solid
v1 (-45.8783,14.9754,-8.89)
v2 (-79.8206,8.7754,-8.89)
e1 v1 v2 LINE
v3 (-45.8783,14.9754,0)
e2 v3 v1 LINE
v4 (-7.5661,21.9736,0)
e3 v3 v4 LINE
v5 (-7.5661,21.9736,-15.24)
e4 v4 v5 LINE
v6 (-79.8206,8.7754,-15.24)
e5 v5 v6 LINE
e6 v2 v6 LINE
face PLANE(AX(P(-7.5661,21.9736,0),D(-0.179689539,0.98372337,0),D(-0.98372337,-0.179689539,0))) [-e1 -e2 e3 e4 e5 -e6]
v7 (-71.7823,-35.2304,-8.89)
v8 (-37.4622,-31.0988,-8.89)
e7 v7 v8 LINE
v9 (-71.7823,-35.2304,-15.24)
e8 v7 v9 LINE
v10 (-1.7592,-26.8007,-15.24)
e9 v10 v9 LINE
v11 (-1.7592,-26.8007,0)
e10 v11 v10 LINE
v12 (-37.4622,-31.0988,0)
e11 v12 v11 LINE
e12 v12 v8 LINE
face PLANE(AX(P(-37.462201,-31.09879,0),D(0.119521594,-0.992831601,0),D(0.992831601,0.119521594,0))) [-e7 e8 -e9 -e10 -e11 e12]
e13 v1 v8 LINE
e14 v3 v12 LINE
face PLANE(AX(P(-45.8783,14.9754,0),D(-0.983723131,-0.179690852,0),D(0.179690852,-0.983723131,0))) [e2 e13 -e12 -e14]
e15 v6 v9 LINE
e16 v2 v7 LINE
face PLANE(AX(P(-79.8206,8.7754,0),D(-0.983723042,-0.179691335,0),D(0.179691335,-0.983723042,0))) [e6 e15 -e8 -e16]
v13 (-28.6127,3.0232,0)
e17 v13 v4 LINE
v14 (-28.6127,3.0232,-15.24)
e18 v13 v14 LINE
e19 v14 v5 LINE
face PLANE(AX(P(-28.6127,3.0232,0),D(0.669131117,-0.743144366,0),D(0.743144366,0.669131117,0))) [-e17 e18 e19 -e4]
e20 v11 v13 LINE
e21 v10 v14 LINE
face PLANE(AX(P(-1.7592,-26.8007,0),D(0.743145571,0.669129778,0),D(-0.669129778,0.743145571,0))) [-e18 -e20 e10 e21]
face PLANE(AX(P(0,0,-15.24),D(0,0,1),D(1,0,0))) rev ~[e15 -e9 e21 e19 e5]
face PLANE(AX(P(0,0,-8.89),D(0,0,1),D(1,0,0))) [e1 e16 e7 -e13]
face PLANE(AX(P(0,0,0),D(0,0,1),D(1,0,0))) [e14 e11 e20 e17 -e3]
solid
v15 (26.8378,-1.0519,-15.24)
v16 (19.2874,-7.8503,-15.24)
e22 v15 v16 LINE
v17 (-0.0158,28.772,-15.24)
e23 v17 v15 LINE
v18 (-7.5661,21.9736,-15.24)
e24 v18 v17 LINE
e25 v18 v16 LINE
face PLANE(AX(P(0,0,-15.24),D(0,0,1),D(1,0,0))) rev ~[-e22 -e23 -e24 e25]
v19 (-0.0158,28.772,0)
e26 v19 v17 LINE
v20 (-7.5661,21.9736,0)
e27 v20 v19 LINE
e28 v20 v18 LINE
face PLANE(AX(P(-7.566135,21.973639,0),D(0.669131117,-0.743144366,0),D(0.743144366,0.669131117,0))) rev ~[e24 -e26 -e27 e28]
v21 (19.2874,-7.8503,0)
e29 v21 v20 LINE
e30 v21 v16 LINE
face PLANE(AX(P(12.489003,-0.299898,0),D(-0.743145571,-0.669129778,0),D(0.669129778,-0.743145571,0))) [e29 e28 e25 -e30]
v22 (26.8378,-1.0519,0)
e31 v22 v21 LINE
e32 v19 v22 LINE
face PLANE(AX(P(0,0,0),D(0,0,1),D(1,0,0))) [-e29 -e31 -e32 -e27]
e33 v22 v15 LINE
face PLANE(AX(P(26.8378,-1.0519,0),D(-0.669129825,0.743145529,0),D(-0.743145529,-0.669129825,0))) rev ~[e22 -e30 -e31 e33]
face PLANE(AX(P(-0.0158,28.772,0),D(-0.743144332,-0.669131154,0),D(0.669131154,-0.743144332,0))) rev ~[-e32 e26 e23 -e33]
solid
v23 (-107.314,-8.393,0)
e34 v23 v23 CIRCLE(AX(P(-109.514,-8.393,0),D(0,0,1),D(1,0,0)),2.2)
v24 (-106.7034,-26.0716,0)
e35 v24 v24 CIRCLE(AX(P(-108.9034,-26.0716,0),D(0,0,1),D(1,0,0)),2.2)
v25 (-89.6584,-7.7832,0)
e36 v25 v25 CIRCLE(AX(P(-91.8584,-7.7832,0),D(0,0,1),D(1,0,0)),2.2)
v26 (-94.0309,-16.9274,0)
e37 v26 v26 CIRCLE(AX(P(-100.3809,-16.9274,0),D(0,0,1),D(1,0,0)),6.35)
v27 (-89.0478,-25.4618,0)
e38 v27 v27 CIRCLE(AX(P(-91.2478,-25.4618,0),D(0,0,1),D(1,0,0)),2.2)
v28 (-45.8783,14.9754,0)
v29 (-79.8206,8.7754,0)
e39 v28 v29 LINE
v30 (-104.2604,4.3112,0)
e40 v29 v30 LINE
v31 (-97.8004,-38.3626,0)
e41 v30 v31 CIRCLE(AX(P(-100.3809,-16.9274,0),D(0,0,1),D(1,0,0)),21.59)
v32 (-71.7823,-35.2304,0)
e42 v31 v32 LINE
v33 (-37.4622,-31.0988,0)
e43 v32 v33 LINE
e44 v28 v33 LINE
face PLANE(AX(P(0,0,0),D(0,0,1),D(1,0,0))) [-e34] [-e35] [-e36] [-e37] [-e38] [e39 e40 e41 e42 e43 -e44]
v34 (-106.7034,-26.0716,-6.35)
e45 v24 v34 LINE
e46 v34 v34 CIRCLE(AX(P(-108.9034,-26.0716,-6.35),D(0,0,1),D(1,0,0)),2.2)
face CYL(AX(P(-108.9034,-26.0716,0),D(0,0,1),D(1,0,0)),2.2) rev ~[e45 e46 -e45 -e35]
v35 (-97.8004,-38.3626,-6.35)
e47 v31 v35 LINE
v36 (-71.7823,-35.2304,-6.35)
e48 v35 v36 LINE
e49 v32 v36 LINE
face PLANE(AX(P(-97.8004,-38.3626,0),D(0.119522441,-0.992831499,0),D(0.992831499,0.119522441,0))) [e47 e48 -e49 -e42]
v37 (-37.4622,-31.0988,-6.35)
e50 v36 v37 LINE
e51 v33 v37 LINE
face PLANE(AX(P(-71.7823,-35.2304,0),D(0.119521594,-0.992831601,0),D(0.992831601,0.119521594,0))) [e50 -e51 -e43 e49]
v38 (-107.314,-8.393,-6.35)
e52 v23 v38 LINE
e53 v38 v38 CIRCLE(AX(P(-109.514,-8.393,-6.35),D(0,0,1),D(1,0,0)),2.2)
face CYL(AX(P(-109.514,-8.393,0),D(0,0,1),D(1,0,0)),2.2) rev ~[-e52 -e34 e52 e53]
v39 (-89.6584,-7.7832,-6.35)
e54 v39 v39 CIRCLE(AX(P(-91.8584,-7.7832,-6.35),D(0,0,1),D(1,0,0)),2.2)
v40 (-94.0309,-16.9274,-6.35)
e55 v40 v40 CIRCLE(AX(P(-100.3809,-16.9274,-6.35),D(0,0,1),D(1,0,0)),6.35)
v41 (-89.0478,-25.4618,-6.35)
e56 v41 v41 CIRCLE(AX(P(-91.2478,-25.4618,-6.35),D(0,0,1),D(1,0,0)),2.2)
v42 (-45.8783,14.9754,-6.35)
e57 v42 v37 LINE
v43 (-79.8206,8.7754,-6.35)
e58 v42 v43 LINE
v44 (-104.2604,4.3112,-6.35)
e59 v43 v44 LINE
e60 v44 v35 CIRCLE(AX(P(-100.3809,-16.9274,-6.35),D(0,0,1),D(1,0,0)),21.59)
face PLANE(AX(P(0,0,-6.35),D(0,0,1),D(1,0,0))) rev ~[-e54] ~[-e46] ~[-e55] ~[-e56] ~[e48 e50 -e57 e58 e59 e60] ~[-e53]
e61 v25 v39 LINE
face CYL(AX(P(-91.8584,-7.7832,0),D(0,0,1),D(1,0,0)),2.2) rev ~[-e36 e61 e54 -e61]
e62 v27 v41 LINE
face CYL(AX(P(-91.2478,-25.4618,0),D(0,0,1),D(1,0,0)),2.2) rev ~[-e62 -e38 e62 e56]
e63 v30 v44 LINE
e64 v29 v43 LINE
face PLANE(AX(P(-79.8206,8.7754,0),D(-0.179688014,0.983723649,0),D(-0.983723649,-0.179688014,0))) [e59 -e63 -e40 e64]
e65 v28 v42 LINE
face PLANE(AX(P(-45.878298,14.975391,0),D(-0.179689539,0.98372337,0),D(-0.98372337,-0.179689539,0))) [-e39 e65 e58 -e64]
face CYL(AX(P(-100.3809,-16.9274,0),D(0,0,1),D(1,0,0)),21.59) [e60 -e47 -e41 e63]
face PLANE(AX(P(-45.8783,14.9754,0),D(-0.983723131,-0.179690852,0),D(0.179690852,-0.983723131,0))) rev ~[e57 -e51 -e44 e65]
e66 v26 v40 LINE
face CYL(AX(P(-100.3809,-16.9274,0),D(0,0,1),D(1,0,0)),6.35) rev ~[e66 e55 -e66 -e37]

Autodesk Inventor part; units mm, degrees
ref_plane "Back Plane" through (0, 0, -12.7) normal (0, 0, -1) x (-1, 0, 0)
ref_plane "Midplane" through (0, 0, -6.35) normal (0, 0, 1) x (1, 0, 0)
ref_plane "YZ Plane" through (0, 0, 0) normal (1, 0, 0) x (0, 1, 0)
sketch "the Axle" plane through (0, 0, 0) normal (0, 0, 1) x (1, 0, 0)
  line L0 (-30.4731, 63.7704) -> (-43.9693, 51.6183)
  line L1 (-43.9693, 51.6183) -> (-54.1341, 62.9075)
  line L2 (-40.6378, 75.0595) -> (-30.4731, 63.7704)
  line L3 (-30.4731, 63.7704) -> (-12.3121, 63.7704) construction
  arc A0 (-40.6378, 75.0595) -> (-54.1341, 62.9075) centre (-42.9621, 64.0703) ccw
  line L4 (-54.1341, 62.9075) -> (-40.6378, 75.0595) construction
  point P0 (-12.6671, 65.6222)
  dimension "d84" = 18.161
  dimension "d85" = 138
  dimension "d231" = 19.812
sketch "Motor Mount Pattern" plane through (0, 0, 0) normal (0, 0, 1) x (1, 0, 0)
  line L0 (-116.3697, 51.2894) -> (-116.3697, 68.9671) construction
  line L1 (-116.3697, 68.9671) -> (-134.0474, 68.9671) construction
  line L2 (-134.0474, 68.9671) -> (-134.0474, 51.2894) construction
  line L3 (-134.0474, 51.2894) -> (-116.3697, 68.9671) construction
  line L4 (-116.3697, 51.2894) -> (-134.0474, 68.9671) construction
  line L5 (-134.0474, 51.2894) -> (-134.0474, 68.9671) construction
  line L6 (-134.0474, 51.2894) -> (-116.3697, 68.9671) construction
  line L7 (-134.0474, 51.2894) -> (-125.2086, 60.1282) construction
  line L8 (-116.3697, 51.2894) -> (-134.0474, 51.2894) construction
  circle A0 centre (-125.2086, 60.1282) radius 6.2
  circle A1 centre (-116.3697, 68.9671) radius 2.25
  circle A2 centre (-134.0474, 68.9671) radius 2.25
  circle A3 centre (-116.3697, 51.2894) radius 2.25
  circle A4 centre (-134.0474, 51.2894) radius 2.25
  circle A5 centre (-116.3697, 68.9671) radius 4.5 construction
  circle A6 centre (-134.0474, 68.9671) radius 4.5 construction
  circle A7 centre (-134.0474, 51.2894) radius 4.5 construction
  circle A8 centre (-116.3697, 51.2894) radius 4.5 construction
  point P0 (-121.7102, 57.8126)
  dimension "d189" = 25
  dimension "d192" = 12.4
  dimension "d193" = 4.5
  dimension "d195" = 9
sketch "Motor Body Extent" plane through (0, 0, 0) normal (0, 0, 1) x (1, 0, 0)
  circle A0 centre (-176.4641, 62.233) radius 24.5 construction
  dimension "MotorDia" = 49
sketch "Block7" plane through (0, 0, 0) normal (0, 0, 1) x (1, 0, 0)
  line L0 (-114.6206, 39.8537) -> (-104.0422, 54.0169) construction
  line L1 (-104.0422, 54.0169) -> (-118.2054, 64.5953) construction
  line L2 (-118.2054, 64.5953) -> (-128.7838, 50.432) construction
  line L3 (-128.7838, 50.432) -> (-104.0422, 54.0169) construction
  line L4 (-114.6206, 39.8537) -> (-118.2054, 64.5953) construction
  line L5 (-128.7838, 50.432) -> (-118.2054, 64.5953) construction
  line L6 (-128.7838, 50.432) -> (-104.0422, 54.0169) construction
  line L7 (-128.7838, 50.432) -> (-116.413, 52.2245) construction
  line L8 (-114.6206, 39.8537) -> (-128.7838, 50.432) construction
  circle A0 centre (-116.413, 52.2245) radius 6.2
  circle A1 centre (-104.0422, 54.0169) radius 2.25
  circle A2 centre (-118.2054, 64.5953) radius 2.25
  circle A3 centre (-114.6206, 39.8537) radius 2.25
  circle A4 centre (-128.7838, 50.432) radius 2.25
  circle A5 centre (-104.0422, 54.0169) radius 4.5 construction
  circle A6 centre (-118.2054, 64.5953) radius 4.5 construction
  circle A7 centre (-128.7838, 50.432) radius 4.5 construction
  circle A8 centre (-114.6206, 39.8537) radius 4.5 construction
  line L9 (-107.5171, 56.2696) -> (-121.6653, 66.8681) construction
  line L10 (-121.6653, 66.8681) -> (-132.2638, 52.7199) construction
  line L11 (-132.2638, 52.7199) -> (-118.1156, 42.1214) construction
  line L12 (-118.1156, 42.1214) -> (-121.6653, 66.8681) construction
  line L13 (-107.5171, 56.2696) -> (-132.2638, 52.7199) construction
  line L14 (-118.1156, 42.1214) -> (-132.2638, 52.7199) construction
  line L15 (-118.1156, 42.1214) -> (-121.6653, 66.8681) construction
  line L16 (-118.1156, 42.1214) -> (-119.8904, 54.4948) construction
  line L17 (-107.5171, 56.2696) -> (-118.1156, 42.1214) construction
  circle A9 centre (-119.8904, 54.4948) radius 6.2
  circle A10 centre (-121.6653, 66.8681) radius 2.25
  circle A11 centre (-132.2638, 52.7199) radius 2.25
  circle A12 centre (-107.5171, 56.2696) radius 2.25
  circle A13 centre (-118.1156, 42.1214) radius 2.25
  circle A14 centre (-121.6653, 66.8681) radius 4.5 construction
  circle A15 centre (-132.2638, 52.7199) radius 4.5 construction
  circle A16 centre (-118.1156, 42.1214) radius 4.5 construction
  circle A17 centre (-107.5171, 56.2696) radius 4.5 construction
  line L18 (-105.811, 55.3186) -> (-120.0113, 65.8472) construction
  line L19 (-120.0113, 65.8472) -> (-130.5399, 51.6469) construction
  line L20 (-130.5399, 51.6469) -> (-116.3396, 41.1183) construction
  line L21 (-116.3396, 41.1183) -> (-120.0113, 65.8472) construction
  line L22 (-105.811, 55.3186) -> (-130.5399, 51.6469) construction
  line L23 (-116.3396, 41.1183) -> (-130.5399, 51.6469) construction
  line L24 (-116.3396, 41.1183) -> (-120.0113, 65.8472) construction
  line L25 (-116.3396, 41.1183) -> (-118.1755, 53.4828) construction
  line L26 (-105.811, 55.3186) -> (-116.3396, 41.1183) construction
  circle A18 centre (-118.1755, 53.4828) radius 6.2
  circle A19 centre (-120.0113, 65.8472) radius 2.25
  circle A20 centre (-130.5399, 51.6469) radius 2.25
  circle A21 centre (-105.811, 55.3186) radius 2.25
  circle A22 centre (-116.3396, 41.1183) radius 2.25
  circle A23 centre (-120.0113, 65.8472) radius 4.5 construction
  circle A24 centre (-130.5399, 51.6469) radius 4.5 construction
  circle A25 centre (-116.3396, 41.1183) radius 4.5 construction
  circle A26 centre (-105.811, 55.3186) radius 4.5 construction
  point P0 (-115.0557, 53.032)
sketch "MotorMountPattern" plane through (0, 0, 0) normal (0, 0, 1) x (1, 0, 0)
  line L0 (-95.4079, 16.8905) -> (-77.7418, 16.8905) construction
  line L1 (-77.7418, 16.8905) -> (-77.7418, 34.5797) construction
  line L2 (-77.7418, 34.5797) -> (-95.4079, 34.5797) construction
  line L3 (-95.4079, 34.5797) -> (-95.4079, 16.8905) construction
  line L4 (-95.4079, 16.8905) -> (-77.7418, 34.5797) construction
  line L5 (-77.7418, 16.8905) -> (-95.4079, 34.5797) construction
  circle A0 centre (-95.4079, 34.5797) radius 2.2
  circle A1 centre (-77.7418, 34.5797) radius 2.2
  circle A2 centre (-77.7418, 16.8905) radius 2.2
  circle A3 centre (-95.4079, 16.8905) radius 2.2
  circle A4 centre (-86.5749, 25.7351) radius 6.35
  point P0 (-86.5749, 25.7351)
  dimension "d197" = 25
  dimension "M4Clearance" = 4.4
  dimension "MotorShaftClearance" = 12.7
sketch "Base Sketch" plane through (0, 0, 0) normal (0, 0, 1) x (1, 0, 0)
  line L0 (26.8378, -1.0519) -> (-1.7592, -26.8007)
  line L1 (-1.7592, -26.8007) -> (-28.6127, 3.0232)
  line L2 (-28.6127, 3.0232) -> (-0.0158, 28.772)
  line L3 (-0.0158, 28.772) -> (26.8378, -1.0519)
  line L4 (-7.5661, 21.9736) -> (19.2874, -7.8503)
  circle A0 centre (0, 0) radius 41.5 construction
  line L5 (-7.5661, 21.9736) -> (-79.8206, 8.7754)
  line L6 (-97.8004, -38.3626) -> (-71.7823, -35.2304)
  circle A1 centre (-100.3809, -16.9274) radius 21.59
  line L7 (-148.6125, -66.8274) -> (67.2297, -66.8274) construction
  circle A2 centre (-100.3809, -16.9274) radius 24.5 construction
  line L8 (-71.1528, -2.3995) -> (-75.5515, 3.8227)
  line L9 (-65.5155, -27.1154) -> (-69.9143, -20.8933)
  line L10 (-49.848, 2.3791) -> (-54.2467, 8.6013)
  line L11 (-45.6742, -26.5785) -> (-50.073, -20.3564)
  circle A3 centre (-65.5155, -27.1154) radius 2.5527 construction
  line L12 (-45.8783, 14.9754) -> (-37.4622, -31.0988)
  line L13 (-79.8206, 8.7754) -> (-71.7823, -35.2304)
  line L14 (-79.8206, 8.7754) -> (-104.2604, 4.3112)
  line L15 (-71.7823, -35.2304) -> (-1.7592, -26.8007)
  line L16 (12.489, -0.2999) -> (-1.0072, -12.452)
  line L17 (-1.0072, -12.452) -> (-11.172, -1.1629)
  line L18 (2.3243, 10.9892) -> (12.489, -0.2999)
  line L19 (12.489, -0.2999) -> (30.65, -0.2999) construction
  arc A4 (2.3243, 10.9892) -> (-11.172, -1.1629) centre (0, 0) ccw
  line L20 (-11.172, -1.1629) -> (2.3243, 10.9892) construction
  line L21 (-108.9034, -26.0716) -> (-91.2478, -25.4618) construction
  line L22 (-91.2478, -25.4618) -> (-91.8584, -7.7832) construction
  line L23 (-91.8584, -7.7832) -> (-109.514, -8.393) construction
  line L24 (-109.514, -8.393) -> (-108.9034, -26.0716) construction
  line L25 (-108.9034, -26.0716) -> (-91.8584, -7.7832) construction
  line L26 (-91.2478, -25.4618) -> (-109.514, -8.393) construction
  circle A5 centre (-109.514, -8.393) radius 2.2
  circle A6 centre (-91.8584, -7.7832) radius 2.2
  circle A7 centre (-91.2478, -25.4618) radius 2.2
  circle A8 centre (-108.9034, -26.0716) radius 2.2
  circle A9 centre (-100.3809, -16.9274) radius 6.35
  dimension "AxleMargin" = 10.16
  dimension "d97" = 10.16
  dimension "d98" = 10.16
  dimension "d99" = 10.16
  dimension "WheelDia" = 83
  dimension "d157" = 43.18
  dimension "AxleBoardClearance" = 66.8274
  dimension "d233" = 49
  dimension "BoardClearance" = 25.4
  dimension "NomCtrDistance" = 101.7981
  dimension "d258" = 7.62
  dimension "N10Clearance" = 5.1054
  dimension "M4ClearanceDia" = 4.5
  dimension "d211" = 10.8
  dimension "d218" = 9
extrude "Base" add sketch "Base Sketch" against normal blind 15.24 contours L0 L4 L2 L3 | L15 L12 L5 L2 L1 | L15 L13 L5 L12
extrude "Extrusion7" cut sketch "Base Sketch" against normal blind 8.89 contours L15 L13 L5 L12
extrude "Extrusion8" add sketch "Base Sketch" against normal blind 6.35 separate body contours L15 L13 L5 L12 | L6 A1 L14 L13 | A1
sketch "Sketch12" plane through (0, 0, -12.7) normal (0, 0, -1) x (-1, 0, 0)
  line L0 (7.5661, 21.9736) -> (105.9285, 5.8665) projected
  line L1 (100.2333, -36.9167) -> (1.7592, -26.8007) projected
  line L2 (16.1, -21.8905) -> (20.7942, 13.3729)
  line L3 (75.7186, -28.0149) -> (16.1, -21.8905)
  line L4 (20.7942, 13.3729) -> (82.4161, 3.2822)
  line L5 (100.3809, -16.9274) -> (104.4983, -13.952) construction
  line L6 (114.7308, -36.7851) -> (118.8483, -33.8097) construction
  line L7 (90.1484, 5.9057) -> (86.0309, 2.9303) construction
  arc A0 (86.0309, 2.9303) -> (114.7308, -36.7851) centre (100.3809, -16.9274) ccw construction
  arc A1 (118.8483, -33.8097) -> (90.1484, 5.9057) centre (104.4983, -13.952) ccw construction
  line L8 (116.2185, -38.8438) -> (120.336, -35.8684)
  arc A2 (120.336, -35.8684) -> (88.6607, 7.9645) centre (104.4983, -13.952) ccw
  line L9 (88.6607, 7.9645) -> (84.5432, 4.989)
  arc A3 (84.5432, 4.989) -> (82.4161, 3.2822) centre (100.3809, -16.9274) ccw
  arc A4 (75.7186, -28.0149) -> (116.2185, -38.8438) centre (100.3809, -16.9274) ccw
  arc A5 (82.4161, 3.2822) -> (75.7186, -28.0149) centre (100.3809, -16.9274) ccw
  arc A6 (74.798, 4.5297) -> (68.6388, -27.2876) centre (100.3809, -16.9274) ccw
  point P0 (0, 0)
  point P1 (11.172, -1.1629)
  point P2 (102.4396, -15.4397)
  dimension "d178" = 7.62
  dimension "d183" = 6.35
  dimension "d186" = 88.283
  dimension "d187" = 88.283
  dimension "d226" = 6.35
  dimension "d228" = 49
  dimension "d229" = 2.54
  dimension "d251" = 6.35
  dimension "d252" = 2.54
  dimension "d235" = 7.62
  dimension "d236" = 7.62
properties part number "MountSketch"
